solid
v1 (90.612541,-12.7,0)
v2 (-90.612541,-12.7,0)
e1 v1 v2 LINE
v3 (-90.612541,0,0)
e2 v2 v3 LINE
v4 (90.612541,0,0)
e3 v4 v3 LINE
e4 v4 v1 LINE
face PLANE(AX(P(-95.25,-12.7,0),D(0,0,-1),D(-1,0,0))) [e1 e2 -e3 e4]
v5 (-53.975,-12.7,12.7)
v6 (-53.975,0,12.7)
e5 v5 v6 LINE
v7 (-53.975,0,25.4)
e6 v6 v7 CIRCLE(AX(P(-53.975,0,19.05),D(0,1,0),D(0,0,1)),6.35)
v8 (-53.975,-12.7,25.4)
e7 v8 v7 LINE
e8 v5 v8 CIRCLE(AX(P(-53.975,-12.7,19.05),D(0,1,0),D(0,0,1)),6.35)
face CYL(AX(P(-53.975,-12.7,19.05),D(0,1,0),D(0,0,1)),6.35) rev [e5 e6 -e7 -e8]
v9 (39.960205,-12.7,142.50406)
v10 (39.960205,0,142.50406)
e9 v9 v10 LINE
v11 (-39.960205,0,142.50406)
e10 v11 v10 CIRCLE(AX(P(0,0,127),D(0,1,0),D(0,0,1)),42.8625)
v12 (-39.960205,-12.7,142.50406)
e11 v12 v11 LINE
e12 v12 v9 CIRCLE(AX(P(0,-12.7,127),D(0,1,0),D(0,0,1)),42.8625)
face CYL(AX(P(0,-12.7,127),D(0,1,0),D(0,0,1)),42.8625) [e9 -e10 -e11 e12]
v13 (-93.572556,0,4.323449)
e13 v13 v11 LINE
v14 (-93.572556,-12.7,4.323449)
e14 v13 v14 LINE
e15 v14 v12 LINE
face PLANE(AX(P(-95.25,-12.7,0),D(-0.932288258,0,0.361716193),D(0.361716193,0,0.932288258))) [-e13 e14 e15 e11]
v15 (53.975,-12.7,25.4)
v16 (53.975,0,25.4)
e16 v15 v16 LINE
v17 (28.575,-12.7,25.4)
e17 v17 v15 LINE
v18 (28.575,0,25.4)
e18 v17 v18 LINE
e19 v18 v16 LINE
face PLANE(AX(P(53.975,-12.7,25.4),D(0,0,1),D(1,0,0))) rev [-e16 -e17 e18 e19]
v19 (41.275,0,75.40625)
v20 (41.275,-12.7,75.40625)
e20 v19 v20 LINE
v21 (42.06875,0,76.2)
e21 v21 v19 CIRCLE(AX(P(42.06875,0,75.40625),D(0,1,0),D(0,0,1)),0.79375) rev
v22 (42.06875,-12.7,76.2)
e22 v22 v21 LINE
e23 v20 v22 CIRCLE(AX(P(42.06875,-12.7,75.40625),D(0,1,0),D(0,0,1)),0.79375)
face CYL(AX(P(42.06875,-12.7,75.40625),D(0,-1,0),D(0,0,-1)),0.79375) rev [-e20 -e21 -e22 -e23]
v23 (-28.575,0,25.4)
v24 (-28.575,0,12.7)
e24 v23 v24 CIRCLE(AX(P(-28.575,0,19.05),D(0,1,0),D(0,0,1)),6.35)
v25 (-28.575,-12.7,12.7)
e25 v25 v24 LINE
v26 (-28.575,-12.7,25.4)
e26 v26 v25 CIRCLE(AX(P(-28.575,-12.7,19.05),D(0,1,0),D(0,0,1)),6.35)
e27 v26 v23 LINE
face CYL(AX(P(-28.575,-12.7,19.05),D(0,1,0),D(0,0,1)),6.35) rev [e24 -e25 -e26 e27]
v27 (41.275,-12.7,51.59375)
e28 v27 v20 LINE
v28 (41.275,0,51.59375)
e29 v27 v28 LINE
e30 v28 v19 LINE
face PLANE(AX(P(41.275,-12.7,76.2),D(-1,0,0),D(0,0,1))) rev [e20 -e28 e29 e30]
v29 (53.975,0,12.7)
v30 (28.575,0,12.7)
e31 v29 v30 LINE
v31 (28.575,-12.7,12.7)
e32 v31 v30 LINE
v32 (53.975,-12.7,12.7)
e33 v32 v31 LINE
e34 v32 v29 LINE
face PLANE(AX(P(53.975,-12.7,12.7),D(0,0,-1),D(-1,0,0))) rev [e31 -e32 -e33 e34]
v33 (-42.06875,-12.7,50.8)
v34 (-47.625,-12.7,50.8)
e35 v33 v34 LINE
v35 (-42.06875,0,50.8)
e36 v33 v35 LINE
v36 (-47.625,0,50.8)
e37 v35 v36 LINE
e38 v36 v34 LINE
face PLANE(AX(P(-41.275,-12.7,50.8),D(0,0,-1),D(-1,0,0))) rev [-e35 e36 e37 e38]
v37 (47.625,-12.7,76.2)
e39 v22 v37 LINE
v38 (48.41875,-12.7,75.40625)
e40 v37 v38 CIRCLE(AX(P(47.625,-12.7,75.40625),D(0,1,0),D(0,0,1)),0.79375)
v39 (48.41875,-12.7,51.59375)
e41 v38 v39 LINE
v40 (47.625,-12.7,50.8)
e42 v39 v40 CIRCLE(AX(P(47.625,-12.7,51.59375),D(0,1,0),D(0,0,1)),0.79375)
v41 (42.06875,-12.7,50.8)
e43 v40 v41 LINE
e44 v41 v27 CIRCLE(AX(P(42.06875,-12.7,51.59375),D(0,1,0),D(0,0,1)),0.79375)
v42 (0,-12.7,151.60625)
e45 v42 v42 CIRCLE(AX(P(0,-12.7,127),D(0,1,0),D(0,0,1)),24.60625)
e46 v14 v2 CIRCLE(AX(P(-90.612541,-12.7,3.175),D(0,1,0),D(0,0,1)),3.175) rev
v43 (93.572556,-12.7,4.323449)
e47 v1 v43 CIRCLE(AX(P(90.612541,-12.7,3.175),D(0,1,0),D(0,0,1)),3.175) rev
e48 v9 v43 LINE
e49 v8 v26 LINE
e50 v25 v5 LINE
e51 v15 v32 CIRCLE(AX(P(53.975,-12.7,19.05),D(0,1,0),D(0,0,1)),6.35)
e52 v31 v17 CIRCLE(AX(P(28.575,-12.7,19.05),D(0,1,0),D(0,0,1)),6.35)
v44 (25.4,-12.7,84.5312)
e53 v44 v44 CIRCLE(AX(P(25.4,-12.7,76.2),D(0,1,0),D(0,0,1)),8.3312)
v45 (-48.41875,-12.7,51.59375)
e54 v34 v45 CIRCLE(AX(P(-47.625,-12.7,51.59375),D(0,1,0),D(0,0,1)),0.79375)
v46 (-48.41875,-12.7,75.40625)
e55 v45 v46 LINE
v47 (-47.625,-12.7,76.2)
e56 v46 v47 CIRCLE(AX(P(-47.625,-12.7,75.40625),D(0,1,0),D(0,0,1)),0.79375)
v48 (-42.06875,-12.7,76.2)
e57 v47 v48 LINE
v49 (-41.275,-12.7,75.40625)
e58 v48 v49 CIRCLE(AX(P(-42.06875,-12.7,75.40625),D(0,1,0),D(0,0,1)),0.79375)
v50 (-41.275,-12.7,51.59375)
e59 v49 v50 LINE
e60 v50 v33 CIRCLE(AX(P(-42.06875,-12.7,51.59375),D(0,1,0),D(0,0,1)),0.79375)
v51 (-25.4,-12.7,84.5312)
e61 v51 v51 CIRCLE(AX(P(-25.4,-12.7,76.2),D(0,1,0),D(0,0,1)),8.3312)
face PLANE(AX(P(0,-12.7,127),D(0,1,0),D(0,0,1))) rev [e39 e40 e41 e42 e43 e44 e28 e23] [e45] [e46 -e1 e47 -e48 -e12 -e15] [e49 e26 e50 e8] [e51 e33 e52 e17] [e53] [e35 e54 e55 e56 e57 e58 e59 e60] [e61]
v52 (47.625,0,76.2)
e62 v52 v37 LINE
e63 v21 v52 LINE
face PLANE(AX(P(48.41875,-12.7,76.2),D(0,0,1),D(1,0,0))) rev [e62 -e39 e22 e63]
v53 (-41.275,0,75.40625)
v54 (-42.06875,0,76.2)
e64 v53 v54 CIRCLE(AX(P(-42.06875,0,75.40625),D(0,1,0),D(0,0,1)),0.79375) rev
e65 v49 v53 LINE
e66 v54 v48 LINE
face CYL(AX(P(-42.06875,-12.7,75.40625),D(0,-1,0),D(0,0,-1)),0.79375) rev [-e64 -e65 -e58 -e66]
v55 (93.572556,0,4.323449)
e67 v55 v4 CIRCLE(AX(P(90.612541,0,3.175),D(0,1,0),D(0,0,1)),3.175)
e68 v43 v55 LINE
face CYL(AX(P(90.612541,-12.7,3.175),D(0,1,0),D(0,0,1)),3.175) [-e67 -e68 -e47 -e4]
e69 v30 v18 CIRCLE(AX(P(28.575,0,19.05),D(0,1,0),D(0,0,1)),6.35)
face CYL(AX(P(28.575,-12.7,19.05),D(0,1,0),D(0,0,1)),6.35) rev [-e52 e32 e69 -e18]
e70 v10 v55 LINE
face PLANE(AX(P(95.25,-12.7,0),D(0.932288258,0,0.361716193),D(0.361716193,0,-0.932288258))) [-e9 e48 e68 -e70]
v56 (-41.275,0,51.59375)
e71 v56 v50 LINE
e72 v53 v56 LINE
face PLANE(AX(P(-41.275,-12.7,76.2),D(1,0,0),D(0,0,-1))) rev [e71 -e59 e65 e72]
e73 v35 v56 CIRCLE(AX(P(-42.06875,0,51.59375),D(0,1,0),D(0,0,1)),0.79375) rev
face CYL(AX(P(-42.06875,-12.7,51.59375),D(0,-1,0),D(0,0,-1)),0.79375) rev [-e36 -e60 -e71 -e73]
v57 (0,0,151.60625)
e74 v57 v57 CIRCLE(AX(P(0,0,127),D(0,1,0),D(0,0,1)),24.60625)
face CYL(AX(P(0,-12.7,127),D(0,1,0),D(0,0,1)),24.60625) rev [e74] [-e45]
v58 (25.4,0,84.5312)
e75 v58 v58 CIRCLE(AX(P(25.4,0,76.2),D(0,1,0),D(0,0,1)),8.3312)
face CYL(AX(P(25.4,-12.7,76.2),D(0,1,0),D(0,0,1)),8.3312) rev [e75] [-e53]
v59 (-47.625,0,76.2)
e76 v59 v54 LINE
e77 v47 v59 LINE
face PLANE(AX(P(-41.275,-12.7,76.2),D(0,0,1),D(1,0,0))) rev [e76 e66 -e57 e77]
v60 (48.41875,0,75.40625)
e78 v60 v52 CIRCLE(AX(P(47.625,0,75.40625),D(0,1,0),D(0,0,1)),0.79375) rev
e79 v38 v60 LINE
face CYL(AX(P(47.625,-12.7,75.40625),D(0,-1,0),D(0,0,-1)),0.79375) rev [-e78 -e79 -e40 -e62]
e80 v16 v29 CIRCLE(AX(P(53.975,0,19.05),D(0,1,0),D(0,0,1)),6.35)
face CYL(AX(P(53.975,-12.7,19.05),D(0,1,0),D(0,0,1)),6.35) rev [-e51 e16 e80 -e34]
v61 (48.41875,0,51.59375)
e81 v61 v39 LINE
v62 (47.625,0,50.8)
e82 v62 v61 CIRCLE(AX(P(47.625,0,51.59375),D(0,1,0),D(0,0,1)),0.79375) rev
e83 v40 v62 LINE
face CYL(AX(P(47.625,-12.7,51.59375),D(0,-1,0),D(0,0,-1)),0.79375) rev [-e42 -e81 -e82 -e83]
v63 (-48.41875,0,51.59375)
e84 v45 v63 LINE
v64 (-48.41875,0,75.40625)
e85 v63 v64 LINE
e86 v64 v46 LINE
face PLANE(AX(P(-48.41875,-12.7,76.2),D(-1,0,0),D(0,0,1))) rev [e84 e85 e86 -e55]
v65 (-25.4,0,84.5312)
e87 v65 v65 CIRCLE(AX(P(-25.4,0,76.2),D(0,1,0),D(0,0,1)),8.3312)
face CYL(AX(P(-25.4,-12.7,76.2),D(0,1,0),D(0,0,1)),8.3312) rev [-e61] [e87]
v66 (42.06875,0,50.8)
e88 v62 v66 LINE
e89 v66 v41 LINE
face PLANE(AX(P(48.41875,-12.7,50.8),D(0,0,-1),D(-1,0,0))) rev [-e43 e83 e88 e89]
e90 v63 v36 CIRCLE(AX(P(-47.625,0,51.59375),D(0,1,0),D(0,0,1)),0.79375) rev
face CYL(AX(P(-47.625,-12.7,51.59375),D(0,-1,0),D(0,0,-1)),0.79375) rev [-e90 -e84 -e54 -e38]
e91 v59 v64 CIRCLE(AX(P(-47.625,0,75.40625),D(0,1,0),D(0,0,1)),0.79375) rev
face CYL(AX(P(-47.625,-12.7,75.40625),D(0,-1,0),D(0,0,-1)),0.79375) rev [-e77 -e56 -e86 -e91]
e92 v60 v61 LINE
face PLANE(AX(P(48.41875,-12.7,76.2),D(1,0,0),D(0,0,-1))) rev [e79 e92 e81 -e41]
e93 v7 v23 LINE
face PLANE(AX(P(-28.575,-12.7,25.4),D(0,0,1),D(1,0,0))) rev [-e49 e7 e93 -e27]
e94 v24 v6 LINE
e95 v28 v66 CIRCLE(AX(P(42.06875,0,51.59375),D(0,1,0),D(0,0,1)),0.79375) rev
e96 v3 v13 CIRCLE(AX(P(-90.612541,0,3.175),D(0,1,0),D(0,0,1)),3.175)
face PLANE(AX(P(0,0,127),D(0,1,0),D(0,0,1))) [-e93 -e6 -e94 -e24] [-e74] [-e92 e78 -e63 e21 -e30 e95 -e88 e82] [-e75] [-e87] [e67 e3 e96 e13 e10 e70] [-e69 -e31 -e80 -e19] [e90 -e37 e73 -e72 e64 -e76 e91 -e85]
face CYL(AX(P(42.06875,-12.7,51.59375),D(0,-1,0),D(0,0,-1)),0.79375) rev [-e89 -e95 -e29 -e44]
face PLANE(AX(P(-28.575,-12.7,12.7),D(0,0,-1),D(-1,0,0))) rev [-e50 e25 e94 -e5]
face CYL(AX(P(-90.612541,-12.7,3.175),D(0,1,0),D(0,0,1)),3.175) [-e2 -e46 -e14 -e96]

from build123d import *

# Parameters (mm, degrees)
BASE_FLANGE1_DEPTH = 12.7
SKETCH2_R          = 24.60625
SKETCH2_R_2        = 8.3312
CUT_EXTRUDE1_DEPTH = 196.159220654
CUT_EXTRUDE2_DEPTH = 196.159220654
FILLET1_R          = 3.175
SKETCH8_W          = 7.14375
SKETCH8_H          = 25.4
CUT_EXTRUDE3_DEPTH = 195.449637912
FILLET2_R          = 0.79375


# Sheet-metal steps are written as plain solids
with BuildPart() as part:
    # Sketch1 → Base-Flange1 (new body)
    with BuildSketch(Plane(origin=(0, 0, 0), x_dir=(1, 0, 0), z_dir=(0, 1, 0))):
        with BuildLine():
            Line((-95.25, 0), (95.25, 0))
            Line((95.25, 0), (39.960205447, -142.504060335))
            ThreePointArc((39.960205447, -142.504060335), (0, -169.8625), (-39.960205447, -142.504060335))
            Line((-39.960205447, -142.504060335), (-95.25, 0))
        make_face()
    extrude(amount=-BASE_FLANGE1_DEPTH)

    # Sketch2 → Cut-Extrude1 (cut, through all)
    with BuildSketch(Plane(origin=(0, 0, 0), x_dir=(1, 0, 0), z_dir=(0, 1, 0))):
        with Locations(Location((0, -127, 0), (0, 0, 270))):
            Circle(SKETCH2_R)
        with Locations(Location((-25.4, -76.2, 0), (0, 0, 270))):
            Circle(SKETCH2_R_2)
        with Locations(Location((25.4, -76.2, 0), (0, 0, 270))):
            Circle(SKETCH2_R_2)
    extrude(amount=-CUT_EXTRUDE1_DEPTH, mode=Mode.SUBTRACT)

    # Sketch7 → Cut-Extrude2 (cut, through all)
    with BuildSketch(Plane(origin=(0, 0, 0), x_dir=(1, 0, 0), z_dir=(0, 1, 0))):
        with BuildLine():
            Line((53.975, -25.4), (28.575, -25.4))
            ThreePointArc((28.575, -25.4), (22.225, -19.05), (28.575, -12.7))
            Line((28.575, -12.7), (53.975, -12.7))
            ThreePointArc((53.975, -12.7), (60.325, -19.05), (53.975, -25.4))
        make_face()
        with BuildLine():
            Line((-28.575, -25.4), (-53.975, -25.4))
            ThreePointArc((-53.975, -25.4), (-60.325, -19.05), (-53.975, -12.7))
            Line((-53.975, -12.7), (-28.575, -12.7))
            ThreePointArc((-28.575, -12.7), (-22.225, -19.05), (-28.575, -25.4))
        make_face()
    extrude(amount=-CUT_EXTRUDE2_DEPTH, mode=Mode.SUBTRACT)

    # Fillet1
    fillet1_edges = [part.edges().sort_by_distance(p)[0] for p in [
        (-95.25, -6.35, 0),
        (95.25, -6.35, 0),
    ]]
    fillet(fillet1_edges, radius=FILLET1_R)

    # Sketch8 → Cut-Extrude3 (cut, through all)
    with BuildSketch(Plane(origin=(0, 0, 0), x_dir=(1, 0, 0), z_dir=(0, 1, 0))):
        with Locations((44.846875, -63.5)):
            Rectangle(SKETCH8_W, SKETCH8_H)
        with Locations((-44.846875, -63.5)):
            Rectangle(SKETCH8_W, SKETCH8_H)
    extrude(amount=-CUT_EXTRUDE3_DEPTH, mode=Mode.SUBTRACT)

    # Fillet2
    fillet2_edges = [part.edges().sort_by_distance(p)[0] for p in [
        (41.275, -6.35, 76.2),
        (41.275, -6.35, 50.8),
        (48.41875, -6.35, 50.8),
        (48.41875, -6.35, 76.2),
        (-48.41875, -6.35, 76.2),
        (-48.41875, -6.35, 50.8),
        (-41.275, -6.35, 50.8),
        (-41.275, -6.35, 76.2),
    ]]
    fillet(fillet2_edges, radius=FILLET2_R)


solid = part.part
